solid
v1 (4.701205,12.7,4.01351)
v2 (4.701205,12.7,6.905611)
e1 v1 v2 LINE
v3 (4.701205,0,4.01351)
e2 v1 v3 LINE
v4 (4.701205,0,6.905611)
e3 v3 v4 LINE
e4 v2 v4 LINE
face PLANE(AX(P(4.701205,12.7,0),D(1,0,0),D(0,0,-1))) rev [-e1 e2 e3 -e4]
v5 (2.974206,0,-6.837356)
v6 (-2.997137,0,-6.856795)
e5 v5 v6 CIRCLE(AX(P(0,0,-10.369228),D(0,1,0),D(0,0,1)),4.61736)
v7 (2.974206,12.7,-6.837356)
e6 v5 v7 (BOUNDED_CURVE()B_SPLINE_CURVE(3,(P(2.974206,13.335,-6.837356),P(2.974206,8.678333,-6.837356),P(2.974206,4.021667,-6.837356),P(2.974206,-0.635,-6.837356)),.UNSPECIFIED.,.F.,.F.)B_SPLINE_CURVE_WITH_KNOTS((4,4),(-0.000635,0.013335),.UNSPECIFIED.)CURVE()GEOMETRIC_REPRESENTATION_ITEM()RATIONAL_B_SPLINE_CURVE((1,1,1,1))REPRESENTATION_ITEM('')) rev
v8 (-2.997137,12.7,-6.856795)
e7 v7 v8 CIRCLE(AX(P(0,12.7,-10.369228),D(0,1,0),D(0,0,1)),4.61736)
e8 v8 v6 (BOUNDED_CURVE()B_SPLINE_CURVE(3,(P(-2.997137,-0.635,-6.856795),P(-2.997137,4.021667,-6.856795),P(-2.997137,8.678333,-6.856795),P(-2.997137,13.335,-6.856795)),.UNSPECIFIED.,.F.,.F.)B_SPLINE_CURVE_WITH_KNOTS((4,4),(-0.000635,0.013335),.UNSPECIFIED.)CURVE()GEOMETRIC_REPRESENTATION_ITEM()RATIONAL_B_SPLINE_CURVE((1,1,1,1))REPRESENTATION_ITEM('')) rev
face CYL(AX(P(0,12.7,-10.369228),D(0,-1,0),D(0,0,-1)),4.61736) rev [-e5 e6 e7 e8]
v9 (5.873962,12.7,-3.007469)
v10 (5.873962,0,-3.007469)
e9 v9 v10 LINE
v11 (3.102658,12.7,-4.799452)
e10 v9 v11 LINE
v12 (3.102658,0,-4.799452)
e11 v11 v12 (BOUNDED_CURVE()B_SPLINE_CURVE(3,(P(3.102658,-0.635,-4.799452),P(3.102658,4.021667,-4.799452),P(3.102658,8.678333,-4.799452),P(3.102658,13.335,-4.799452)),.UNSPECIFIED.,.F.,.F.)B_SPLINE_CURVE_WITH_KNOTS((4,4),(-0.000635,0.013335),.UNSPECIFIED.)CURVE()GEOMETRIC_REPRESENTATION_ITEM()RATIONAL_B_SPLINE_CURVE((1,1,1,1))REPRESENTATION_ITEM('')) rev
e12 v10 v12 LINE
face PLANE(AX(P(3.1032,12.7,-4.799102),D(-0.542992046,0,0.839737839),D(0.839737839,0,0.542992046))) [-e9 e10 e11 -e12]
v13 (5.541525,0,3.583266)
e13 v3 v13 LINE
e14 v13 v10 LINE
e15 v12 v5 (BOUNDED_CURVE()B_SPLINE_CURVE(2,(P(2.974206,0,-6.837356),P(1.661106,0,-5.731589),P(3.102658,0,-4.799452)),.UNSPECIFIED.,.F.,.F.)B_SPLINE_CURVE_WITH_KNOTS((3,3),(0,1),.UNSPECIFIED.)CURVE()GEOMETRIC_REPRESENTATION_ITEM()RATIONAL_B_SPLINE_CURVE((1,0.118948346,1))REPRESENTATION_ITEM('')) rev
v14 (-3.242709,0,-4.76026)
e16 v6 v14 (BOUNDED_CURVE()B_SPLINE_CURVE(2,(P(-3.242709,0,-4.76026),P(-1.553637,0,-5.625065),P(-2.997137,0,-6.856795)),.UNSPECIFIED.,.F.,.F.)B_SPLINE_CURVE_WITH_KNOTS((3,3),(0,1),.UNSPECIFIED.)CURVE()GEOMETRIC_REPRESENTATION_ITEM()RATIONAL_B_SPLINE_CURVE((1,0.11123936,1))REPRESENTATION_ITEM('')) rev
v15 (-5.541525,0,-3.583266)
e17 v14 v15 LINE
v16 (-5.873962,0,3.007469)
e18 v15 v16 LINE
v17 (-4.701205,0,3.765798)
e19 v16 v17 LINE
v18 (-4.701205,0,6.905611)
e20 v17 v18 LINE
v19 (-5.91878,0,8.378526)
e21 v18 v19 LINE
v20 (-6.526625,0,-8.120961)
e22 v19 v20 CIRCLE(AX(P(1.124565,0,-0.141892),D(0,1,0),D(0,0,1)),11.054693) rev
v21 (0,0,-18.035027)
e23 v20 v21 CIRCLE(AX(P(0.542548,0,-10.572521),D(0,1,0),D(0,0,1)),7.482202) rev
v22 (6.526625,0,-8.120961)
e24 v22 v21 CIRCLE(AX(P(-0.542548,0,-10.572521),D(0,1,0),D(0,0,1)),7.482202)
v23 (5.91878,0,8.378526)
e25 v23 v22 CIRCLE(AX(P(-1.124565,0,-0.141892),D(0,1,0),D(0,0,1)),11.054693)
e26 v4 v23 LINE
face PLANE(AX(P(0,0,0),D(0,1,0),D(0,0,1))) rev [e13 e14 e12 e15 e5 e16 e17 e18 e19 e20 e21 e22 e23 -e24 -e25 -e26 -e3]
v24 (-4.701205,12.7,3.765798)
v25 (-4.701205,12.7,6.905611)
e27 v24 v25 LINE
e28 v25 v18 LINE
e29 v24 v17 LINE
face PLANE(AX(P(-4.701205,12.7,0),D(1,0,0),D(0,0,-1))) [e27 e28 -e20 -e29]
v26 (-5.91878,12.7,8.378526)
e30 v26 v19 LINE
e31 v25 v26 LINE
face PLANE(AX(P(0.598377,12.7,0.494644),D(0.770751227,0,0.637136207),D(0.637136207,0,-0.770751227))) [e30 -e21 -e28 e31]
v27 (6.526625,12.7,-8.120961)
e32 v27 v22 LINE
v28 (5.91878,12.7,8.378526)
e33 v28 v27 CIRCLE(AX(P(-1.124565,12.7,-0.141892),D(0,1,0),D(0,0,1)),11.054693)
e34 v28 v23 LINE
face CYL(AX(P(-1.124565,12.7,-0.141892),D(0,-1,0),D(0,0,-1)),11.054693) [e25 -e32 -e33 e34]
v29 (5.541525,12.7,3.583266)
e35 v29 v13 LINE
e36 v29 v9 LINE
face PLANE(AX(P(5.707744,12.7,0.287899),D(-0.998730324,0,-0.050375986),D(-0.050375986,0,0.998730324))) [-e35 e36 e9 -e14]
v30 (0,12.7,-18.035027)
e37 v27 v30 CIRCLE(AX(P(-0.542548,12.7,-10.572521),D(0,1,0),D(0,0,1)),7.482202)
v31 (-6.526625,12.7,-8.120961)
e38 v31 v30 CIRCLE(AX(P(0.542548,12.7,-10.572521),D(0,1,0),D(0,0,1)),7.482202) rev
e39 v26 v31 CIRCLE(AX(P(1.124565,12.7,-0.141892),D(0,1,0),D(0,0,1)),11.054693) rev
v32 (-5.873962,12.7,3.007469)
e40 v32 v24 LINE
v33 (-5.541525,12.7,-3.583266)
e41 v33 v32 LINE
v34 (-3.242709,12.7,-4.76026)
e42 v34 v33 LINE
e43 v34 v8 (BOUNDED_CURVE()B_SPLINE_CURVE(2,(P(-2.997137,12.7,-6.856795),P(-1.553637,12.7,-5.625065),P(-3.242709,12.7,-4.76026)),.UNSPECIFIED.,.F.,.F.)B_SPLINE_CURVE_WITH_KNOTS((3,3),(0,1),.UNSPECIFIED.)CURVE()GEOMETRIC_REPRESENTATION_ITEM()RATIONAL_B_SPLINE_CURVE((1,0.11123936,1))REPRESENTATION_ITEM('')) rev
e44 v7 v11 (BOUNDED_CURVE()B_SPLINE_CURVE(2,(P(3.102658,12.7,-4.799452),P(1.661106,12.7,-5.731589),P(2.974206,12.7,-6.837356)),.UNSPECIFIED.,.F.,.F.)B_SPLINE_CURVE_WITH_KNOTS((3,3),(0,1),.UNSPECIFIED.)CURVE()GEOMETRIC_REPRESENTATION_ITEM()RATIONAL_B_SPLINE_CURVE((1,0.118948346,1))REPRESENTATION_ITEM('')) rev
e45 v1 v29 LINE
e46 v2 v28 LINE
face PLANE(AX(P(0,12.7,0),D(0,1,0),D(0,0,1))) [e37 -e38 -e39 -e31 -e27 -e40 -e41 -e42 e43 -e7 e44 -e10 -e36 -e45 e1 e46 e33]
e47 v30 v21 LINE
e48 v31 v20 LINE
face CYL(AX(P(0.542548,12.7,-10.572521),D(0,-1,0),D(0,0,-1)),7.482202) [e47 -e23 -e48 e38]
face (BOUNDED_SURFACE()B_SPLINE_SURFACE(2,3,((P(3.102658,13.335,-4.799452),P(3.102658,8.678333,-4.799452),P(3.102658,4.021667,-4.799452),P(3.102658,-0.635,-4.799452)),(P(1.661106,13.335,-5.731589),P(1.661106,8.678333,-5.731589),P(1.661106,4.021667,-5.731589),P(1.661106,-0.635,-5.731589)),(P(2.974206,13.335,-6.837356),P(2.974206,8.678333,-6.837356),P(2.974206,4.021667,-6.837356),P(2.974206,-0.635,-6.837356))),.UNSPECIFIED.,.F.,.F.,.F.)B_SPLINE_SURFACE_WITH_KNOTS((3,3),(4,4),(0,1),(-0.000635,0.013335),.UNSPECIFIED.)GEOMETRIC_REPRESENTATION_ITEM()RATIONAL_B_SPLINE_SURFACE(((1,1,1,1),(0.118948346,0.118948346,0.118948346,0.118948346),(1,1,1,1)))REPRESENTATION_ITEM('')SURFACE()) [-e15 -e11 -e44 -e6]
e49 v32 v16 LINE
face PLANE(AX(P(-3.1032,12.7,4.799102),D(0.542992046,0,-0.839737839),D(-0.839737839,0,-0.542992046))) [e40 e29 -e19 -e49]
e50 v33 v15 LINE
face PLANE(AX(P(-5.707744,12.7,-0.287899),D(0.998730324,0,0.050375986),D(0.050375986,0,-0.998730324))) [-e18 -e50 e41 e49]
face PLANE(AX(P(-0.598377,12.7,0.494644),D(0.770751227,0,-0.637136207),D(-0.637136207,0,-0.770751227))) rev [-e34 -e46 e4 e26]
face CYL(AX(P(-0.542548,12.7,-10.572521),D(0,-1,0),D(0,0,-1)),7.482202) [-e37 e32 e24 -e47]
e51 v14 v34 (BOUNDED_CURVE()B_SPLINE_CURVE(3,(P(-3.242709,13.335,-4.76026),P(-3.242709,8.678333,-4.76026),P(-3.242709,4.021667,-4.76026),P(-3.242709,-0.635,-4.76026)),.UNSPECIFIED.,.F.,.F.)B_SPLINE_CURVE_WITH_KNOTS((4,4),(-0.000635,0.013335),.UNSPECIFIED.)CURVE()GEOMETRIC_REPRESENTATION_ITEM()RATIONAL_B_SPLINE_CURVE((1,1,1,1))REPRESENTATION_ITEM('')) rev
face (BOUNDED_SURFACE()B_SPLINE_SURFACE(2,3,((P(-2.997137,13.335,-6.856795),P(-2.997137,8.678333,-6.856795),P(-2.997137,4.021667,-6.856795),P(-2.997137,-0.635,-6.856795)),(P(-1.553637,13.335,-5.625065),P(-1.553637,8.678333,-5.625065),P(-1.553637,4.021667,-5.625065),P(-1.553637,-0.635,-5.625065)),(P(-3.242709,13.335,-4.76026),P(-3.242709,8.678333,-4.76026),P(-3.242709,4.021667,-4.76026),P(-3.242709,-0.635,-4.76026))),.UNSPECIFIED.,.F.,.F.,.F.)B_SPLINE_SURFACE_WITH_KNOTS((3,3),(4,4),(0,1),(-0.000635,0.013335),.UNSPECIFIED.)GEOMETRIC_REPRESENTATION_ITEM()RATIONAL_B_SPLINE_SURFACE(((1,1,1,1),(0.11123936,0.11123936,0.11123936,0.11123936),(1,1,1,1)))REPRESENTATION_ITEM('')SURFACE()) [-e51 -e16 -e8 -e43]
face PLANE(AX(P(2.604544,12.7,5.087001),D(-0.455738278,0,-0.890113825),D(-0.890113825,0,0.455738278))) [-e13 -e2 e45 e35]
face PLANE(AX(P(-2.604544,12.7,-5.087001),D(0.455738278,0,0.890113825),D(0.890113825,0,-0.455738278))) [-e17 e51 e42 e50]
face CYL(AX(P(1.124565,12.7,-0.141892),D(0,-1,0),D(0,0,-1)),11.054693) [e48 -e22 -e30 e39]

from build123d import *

# Parameters (mm, degrees)
BOSS_EXTRUDE1_DEPTH = 12.7


with BuildPart() as part:
    # Sketch3 → Boss-Extrude1 (new body)
    with BuildSketch(Plane(origin=(0, 0, 0), x_dir=(1, 0, 0), z_dir=(0, 1, 0))):
        with BuildLine():
            Line((-5.541525375, 3.58326618), (-2.47962532, 5.150959008))
            Line((-2.47962532, 5.150959008), (-2.47962532, 6.474170352))
            ThreePointArc((-2.47962532, 6.474170352), (-2.221563685, 14.417025562), (4.617359972, 10.369227654))
            ThreePointArc((4.617359972, 10.369227654), (4.047797908, 8.147663968), (2.47962532, 6.474170352))
            Line((2.47962532, 6.474170352), (2.47962532, 5.20231788))
            Line((2.47962532, 5.20231788), (5.873962228, 3.007468661))
            Line((5.873962228, 3.007468661), (5.541525375, -3.58326618))
            Line((5.541525375, -3.58326618), (4.701204968, -4.013510228))
            Line((4.701204968, -4.013510228), (4.701204968, -6.905610932))
            Line((4.701204968, -6.905610932), (5.918780254, -8.378526195))
            ThreePointArc((5.918780254, -8.378526195), (9.922634137, -0.265088751), (6.526624698, 8.120961152))
            ThreePointArc((6.526624698, 8.120961152), (5.706991897, 14.686716316), (0, 18.035026682))
            ThreePointArc((0, 18.035026682), (-5.706991897, 14.686716316), (-6.526624698, 8.120961152))
            ThreePointArc((-6.526624698, 8.120961152), (-9.922634137, -0.265088751), (-5.918780254, -8.378526195))
            Line((-5.918780254, -8.378526195), (-4.701204968, -6.905610932))
            Line((-4.701204968, -6.905610932), (-4.701204968, -3.765798027))
            Line((-4.701204968, -3.765798027), (-5.873962228, -3.007468661))
            Line((-5.873962228, -3.007468661), (-5.541525375, 3.58326618))
        make_face()
        with BuildLine():
            Line((-2.47962532, 6.474170352), (-2.47962532, 5.150959008))
            Line((-2.47962532, 5.150959008), (-1.063503338, 5.876013463))
            ThreePointArc((-1.063503338, 5.876013463), (-1.79663243, 6.115743784), (-2.47962532, 6.474170352))
        make_face()
        with BuildLine():
            ThreePointArc((2.47962532, 6.474170352), (1.921985685, 6.17089654), (1.328021538, 5.946968965))
            Line((1.328021538, 5.946968965), (2.47962532, 5.20231788))
            Line((2.47962532, 5.20231788), (2.47962532, 6.474170352))
        make_face()
    extrude(amount=BOSS_EXTRUDE1_DEPTH)

    # Fillet6
    # a fillet whose section is not a circle: 1.27 mm, written as the material it takes off along each edge
    with BuildSketch(Plane(origin=(1.328021538, -5.283304691, -5.946968965), x_dir=(0.8397378391322112, 0, 0.5429920455490709), z_dir=(0, 1, 0))) as fillet6_piece_1:
        with BuildLine():
            Bezier((2.113321876, 0), (0.3966534, 0), (0.898889741, 1.641556979), weights=[1, 0.118948346, 1])
            ThreePointArc((0.898889741, 1.641556979), (0.533488386, 0.774757636), (0, 0))
            Line((0, 0), (2.113321876, 0))
        make_face()
    extrude(amount=23.266609382, mode=Mode.SUBTRACT)
    with BuildSketch(Plane(origin=(-1.063503338, -6.120582224, -5.876013463), x_dir=(-0.891835980226881, 0, -0.4523589110128793), z_dir=(0, 1, 0))) as fillet6_piece_2:
        with BuildLine():
            Bezier((2.168149873, 0), (0.323600022, 0.445521101), (1.438773255, 1.980852292), weights=[1, 0.11123936, 1])
            Line((1.438773255, 1.980852292), (0, 0))
            ThreePointArc((0, 0), (1.084074937, 0.129064678), (2.168149873, 0))
        make_face()
    extrude(amount=24.941164449, mode=Mode.SUBTRACT)


solid = part.part
